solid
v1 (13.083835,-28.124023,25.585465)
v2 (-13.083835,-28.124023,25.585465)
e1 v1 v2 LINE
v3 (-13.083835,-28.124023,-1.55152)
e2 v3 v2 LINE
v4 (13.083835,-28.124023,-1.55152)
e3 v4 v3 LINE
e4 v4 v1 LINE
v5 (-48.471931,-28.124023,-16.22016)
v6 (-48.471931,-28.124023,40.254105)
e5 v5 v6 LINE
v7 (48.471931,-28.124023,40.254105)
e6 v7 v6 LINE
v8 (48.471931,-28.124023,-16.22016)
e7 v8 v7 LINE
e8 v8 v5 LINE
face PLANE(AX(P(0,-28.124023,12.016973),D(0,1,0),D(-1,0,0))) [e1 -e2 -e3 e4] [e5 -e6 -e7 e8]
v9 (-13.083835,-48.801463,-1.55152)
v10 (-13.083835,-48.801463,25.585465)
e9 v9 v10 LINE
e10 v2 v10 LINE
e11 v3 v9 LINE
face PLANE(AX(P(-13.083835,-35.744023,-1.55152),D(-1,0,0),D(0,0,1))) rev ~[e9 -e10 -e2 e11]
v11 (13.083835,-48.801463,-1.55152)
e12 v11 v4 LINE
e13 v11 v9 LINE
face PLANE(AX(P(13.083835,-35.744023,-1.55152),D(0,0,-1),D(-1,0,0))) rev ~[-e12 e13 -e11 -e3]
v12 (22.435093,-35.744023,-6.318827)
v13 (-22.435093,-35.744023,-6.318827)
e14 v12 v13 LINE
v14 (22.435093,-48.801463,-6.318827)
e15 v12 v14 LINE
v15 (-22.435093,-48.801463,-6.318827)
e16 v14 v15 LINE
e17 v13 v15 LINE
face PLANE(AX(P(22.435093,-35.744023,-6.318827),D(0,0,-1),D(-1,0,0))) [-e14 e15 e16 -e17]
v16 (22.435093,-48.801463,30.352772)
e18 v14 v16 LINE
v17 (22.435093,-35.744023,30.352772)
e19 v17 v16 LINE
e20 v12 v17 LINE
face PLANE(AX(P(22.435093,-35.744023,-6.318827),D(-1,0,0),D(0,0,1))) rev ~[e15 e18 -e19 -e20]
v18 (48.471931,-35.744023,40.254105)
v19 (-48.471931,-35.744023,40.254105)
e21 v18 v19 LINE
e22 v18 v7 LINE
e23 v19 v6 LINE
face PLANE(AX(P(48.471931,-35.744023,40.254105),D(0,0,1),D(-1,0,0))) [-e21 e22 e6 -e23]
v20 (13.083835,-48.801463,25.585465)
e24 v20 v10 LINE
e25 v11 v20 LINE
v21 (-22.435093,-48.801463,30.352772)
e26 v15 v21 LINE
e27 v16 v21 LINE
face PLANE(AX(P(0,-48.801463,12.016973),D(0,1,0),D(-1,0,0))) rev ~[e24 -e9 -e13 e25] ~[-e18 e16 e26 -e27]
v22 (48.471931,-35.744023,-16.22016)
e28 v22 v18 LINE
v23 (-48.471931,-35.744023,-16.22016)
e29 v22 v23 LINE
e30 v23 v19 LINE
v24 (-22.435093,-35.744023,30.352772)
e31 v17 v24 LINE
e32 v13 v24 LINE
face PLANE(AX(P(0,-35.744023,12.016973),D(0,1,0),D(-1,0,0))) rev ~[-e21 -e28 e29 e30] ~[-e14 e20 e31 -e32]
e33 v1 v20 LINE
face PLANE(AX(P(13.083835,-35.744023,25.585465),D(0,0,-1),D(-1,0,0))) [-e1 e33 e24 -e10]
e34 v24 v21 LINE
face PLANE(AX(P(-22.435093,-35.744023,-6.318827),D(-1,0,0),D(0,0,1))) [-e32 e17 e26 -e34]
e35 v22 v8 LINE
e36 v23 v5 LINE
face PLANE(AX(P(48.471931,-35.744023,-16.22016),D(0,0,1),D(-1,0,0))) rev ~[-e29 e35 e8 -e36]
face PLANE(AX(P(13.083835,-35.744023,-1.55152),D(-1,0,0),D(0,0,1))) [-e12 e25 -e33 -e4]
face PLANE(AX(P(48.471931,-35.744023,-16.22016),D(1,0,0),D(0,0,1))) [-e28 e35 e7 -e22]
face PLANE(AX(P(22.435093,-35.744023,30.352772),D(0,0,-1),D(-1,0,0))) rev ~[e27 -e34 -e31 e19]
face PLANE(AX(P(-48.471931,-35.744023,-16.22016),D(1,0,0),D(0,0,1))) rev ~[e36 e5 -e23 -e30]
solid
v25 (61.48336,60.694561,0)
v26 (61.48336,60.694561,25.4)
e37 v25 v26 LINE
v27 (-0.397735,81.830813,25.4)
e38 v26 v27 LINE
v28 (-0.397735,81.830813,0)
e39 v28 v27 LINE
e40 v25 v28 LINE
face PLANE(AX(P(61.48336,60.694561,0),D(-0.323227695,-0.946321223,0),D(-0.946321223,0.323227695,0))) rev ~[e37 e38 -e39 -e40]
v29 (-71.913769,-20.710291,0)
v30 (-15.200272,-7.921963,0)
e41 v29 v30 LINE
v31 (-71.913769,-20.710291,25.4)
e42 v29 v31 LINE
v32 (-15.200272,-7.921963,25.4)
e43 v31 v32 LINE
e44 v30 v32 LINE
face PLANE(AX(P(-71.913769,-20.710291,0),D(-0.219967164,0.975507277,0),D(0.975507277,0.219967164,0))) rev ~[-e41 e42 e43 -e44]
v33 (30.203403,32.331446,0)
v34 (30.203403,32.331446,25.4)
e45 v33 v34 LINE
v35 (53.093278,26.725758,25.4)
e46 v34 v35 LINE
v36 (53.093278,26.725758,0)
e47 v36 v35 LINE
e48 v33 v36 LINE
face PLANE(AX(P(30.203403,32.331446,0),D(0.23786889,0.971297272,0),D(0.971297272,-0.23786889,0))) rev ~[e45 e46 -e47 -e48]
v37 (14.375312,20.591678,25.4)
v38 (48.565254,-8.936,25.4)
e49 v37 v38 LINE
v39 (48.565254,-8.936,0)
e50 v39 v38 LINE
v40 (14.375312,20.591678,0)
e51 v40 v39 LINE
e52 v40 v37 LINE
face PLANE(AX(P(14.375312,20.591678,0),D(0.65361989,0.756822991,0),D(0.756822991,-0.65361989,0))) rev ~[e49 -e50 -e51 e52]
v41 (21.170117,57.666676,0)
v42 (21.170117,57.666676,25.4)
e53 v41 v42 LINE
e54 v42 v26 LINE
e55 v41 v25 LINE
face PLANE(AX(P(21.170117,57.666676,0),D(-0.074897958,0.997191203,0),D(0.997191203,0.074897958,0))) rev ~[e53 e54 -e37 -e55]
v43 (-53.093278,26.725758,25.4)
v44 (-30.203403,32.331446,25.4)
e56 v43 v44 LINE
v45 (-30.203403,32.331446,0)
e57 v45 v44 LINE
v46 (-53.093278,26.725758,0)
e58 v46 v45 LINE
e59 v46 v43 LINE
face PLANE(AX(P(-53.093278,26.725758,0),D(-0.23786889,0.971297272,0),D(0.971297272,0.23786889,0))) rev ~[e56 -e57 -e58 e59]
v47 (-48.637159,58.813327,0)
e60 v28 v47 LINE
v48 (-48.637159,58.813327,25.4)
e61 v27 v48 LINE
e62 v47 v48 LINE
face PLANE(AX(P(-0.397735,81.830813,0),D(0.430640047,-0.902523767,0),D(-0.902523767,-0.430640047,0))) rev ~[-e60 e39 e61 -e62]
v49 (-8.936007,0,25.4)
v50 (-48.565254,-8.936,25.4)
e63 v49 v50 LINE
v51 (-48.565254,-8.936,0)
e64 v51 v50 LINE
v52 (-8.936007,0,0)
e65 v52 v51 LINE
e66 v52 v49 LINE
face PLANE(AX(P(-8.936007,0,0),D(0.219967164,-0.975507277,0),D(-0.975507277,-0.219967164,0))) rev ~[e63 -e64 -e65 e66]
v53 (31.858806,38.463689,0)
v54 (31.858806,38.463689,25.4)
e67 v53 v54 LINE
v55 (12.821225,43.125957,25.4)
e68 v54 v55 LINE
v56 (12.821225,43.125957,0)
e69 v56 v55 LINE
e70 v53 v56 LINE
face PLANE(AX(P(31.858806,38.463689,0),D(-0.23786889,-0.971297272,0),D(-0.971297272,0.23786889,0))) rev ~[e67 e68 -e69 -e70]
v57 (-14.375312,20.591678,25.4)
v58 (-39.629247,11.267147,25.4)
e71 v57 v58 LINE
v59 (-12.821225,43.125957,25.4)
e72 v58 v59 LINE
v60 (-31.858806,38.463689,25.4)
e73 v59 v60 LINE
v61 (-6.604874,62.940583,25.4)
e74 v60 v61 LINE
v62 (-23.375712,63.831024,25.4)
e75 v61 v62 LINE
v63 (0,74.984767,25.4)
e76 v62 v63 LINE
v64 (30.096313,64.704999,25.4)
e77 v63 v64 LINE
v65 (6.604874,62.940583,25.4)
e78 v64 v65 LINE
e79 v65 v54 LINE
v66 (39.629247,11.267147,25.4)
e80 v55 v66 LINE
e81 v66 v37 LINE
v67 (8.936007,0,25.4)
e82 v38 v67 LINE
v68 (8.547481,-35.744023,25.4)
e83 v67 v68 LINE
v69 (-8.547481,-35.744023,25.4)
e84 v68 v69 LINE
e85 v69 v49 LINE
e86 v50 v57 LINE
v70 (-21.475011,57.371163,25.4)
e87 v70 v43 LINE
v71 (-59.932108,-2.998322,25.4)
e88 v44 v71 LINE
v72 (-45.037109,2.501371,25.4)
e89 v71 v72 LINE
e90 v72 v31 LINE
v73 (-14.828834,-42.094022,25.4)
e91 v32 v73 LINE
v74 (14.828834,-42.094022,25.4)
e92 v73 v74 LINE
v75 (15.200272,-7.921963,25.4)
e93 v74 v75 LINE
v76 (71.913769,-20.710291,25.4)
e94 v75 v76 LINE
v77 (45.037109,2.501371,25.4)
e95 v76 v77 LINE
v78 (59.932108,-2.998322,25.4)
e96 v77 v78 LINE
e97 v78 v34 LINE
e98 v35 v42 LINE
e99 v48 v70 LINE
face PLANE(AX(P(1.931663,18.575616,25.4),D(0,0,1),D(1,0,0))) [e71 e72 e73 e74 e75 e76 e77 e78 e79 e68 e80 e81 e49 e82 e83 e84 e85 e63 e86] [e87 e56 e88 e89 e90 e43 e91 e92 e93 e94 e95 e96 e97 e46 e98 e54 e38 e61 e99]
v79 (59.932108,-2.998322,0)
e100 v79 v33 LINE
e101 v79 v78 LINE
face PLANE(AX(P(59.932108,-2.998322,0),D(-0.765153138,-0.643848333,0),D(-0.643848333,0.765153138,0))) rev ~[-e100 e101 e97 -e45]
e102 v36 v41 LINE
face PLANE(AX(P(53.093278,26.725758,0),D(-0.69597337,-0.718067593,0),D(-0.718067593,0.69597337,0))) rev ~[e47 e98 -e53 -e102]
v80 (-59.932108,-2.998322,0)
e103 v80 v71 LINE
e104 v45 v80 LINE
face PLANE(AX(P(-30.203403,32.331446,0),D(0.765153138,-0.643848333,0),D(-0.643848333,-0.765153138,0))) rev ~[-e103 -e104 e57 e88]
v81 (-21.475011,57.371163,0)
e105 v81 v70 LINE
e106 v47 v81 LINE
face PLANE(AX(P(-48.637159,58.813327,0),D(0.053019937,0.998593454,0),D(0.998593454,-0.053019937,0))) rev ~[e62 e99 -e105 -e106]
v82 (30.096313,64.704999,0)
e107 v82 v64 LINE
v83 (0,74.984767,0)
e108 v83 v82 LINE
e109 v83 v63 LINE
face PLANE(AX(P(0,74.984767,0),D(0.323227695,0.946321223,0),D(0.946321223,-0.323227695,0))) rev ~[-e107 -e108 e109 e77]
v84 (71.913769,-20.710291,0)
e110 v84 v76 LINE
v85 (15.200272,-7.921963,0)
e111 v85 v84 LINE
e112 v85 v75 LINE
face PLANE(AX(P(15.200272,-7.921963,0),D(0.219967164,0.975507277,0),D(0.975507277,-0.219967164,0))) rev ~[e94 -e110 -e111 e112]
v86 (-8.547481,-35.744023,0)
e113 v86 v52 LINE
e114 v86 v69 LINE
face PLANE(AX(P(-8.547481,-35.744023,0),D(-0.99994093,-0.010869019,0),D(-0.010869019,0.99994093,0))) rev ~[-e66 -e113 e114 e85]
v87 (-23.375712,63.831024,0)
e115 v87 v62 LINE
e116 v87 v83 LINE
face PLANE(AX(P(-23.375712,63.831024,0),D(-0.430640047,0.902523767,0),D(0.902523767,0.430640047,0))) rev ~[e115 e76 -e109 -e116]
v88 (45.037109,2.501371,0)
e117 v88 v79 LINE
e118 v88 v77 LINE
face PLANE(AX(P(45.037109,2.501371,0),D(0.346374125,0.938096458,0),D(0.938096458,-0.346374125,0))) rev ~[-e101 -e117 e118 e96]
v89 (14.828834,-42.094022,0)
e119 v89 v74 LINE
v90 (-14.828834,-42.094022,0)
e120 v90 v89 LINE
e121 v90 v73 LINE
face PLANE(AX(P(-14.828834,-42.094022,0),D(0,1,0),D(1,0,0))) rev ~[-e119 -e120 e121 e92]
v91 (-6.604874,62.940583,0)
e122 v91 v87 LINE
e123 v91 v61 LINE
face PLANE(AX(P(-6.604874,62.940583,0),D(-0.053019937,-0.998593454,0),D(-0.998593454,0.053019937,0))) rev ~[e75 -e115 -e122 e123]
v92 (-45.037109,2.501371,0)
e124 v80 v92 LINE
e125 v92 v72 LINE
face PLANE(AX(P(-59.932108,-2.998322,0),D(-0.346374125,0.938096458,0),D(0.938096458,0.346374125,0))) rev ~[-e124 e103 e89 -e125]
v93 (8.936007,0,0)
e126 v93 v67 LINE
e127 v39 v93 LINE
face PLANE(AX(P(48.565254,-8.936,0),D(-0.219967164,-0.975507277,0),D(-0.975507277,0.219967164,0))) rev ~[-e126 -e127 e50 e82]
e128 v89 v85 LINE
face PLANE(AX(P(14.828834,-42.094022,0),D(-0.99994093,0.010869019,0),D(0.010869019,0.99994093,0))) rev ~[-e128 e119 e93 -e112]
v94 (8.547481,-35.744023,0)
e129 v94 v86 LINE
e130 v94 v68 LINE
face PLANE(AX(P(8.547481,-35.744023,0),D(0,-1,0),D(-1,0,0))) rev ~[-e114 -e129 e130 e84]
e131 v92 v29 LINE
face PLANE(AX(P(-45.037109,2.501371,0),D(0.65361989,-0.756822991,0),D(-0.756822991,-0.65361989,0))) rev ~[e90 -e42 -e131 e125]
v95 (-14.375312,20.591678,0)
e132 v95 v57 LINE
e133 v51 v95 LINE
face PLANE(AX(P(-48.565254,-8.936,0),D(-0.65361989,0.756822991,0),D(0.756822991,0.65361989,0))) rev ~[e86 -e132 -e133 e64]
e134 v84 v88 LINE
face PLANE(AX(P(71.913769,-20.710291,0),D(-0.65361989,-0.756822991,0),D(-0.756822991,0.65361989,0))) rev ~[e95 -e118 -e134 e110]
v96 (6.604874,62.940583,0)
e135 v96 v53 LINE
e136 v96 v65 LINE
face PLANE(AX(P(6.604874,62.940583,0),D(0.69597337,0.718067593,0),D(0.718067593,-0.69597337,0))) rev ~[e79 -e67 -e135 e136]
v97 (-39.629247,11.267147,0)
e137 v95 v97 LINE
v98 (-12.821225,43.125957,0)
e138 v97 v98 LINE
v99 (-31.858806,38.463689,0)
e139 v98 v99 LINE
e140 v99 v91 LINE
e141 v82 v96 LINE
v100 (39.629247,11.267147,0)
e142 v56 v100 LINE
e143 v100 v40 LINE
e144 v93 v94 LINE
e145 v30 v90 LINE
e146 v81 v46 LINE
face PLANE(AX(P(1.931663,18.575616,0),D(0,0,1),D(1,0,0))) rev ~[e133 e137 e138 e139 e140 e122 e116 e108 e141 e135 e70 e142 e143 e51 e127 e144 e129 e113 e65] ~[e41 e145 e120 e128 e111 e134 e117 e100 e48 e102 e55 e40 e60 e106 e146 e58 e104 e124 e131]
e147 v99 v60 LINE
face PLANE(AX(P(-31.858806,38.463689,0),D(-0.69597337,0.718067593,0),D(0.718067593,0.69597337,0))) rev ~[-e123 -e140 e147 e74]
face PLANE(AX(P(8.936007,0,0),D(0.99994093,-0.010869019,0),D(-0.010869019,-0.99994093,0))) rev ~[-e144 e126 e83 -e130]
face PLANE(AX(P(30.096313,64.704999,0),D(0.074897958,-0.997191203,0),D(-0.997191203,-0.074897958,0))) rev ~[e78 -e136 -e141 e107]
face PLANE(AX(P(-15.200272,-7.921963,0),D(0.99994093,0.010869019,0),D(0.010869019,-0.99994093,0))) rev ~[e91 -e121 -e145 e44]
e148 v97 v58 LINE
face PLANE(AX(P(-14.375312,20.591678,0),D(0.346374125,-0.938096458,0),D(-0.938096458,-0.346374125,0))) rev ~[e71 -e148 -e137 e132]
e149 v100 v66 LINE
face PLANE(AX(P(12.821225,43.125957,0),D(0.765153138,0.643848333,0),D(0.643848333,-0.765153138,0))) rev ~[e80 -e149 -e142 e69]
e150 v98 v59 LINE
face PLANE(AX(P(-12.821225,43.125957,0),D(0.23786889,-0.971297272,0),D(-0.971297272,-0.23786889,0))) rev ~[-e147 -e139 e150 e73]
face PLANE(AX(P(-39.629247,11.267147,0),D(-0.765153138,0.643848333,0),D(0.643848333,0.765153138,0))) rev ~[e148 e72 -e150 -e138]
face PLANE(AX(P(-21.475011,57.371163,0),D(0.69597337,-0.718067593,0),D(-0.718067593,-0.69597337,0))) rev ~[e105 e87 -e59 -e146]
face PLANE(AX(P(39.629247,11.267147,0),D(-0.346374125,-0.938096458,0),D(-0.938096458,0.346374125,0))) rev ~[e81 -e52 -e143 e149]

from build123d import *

# Parameters (mm, degrees)
F1_DEPTH = 25.4
F2_W     = 96.9438627362
F2_H     = 56.4742647111
F2_W_2   = 44.8701865971
F2_H_2   = 36.6715993732
F2_W_3   = 26.1676702648
F2_H_3   = 27.1369842812
F3_DEPTH = 7.62
F4_DEPTH = 13.05744


with BuildPart() as f1:
    # F0 (on Top) → F1 (new body)
    with BuildSketch(Plane.XY):
        Polygon((-15.2002724628, -7.9219630817), (-14.8288337448, -42.0940224084), (0, -42.0940224084), (14.8288337448, -42.0940224084), (15.2002724628, -7.9219630817), (71.9137688096, -20.7102910067), (45.0371085278, 2.5013713437), (59.9321083919, -2.9983216828), (30.2034030994, 32.3314461975), (53.0932784976, 26.7257584044), (21.1701166571, 57.6666764014), (61.4833603316, 60.6945607437), (-0.3977347554, 81.830812644), (-48.6371593785, 58.8133267539), (-21.4750114589, 57.3711629086), (-53.0932784976, 26.7257584044), (-30.2034030994, 32.3314461975), (-59.9321083919, -2.9983216828), (-45.0371085278, 2.5013713437), (-71.9137688096, -20.7102910067), align=None)
        Polygon((8.5474811494, -35.744022578), (0, -35.744022578), (-8.5474811494, -35.744022578), (-8.9360065758, 0), (-48.5652536154, -8.9360000566), (-14.3753122538, 20.5916780978), (-39.6292470396, 11.267147027), (-12.8212254494, 43.1259572506), (-31.858805567, 38.4636893868), (-6.6048740409, 62.940582633), (-23.3757123351, 63.8310238719), (0, 74.9847665429), (30.0963129848, 64.7049993277), (6.6048740409, 62.940582633), (31.858805567, 38.4636893868), (12.8212254494, 43.1259572506), (39.6292470396, 11.267147027), (14.3753122538, 20.5916780978), (48.5652536154, -8.9360000566), (8.9360065758, 0), align=None, mode=Mode.SUBTRACT)
    extrude(amount=F1_DEPTH)


with BuildPart() as f3:
    # F2 (on face) → F3 (new body)
    with BuildSketch(Plane(origin=(0, -35.744022578, 0), x_dir=(-1, 0, 0), z_dir=(0, 1, 0))):
        with Locations((0, 12.0169725269)):
            Rectangle(F2_W, F2_H)
        with Locations((0, 12.0169725269)):
            Rectangle(F2_W_2, F2_H_2, mode=Mode.SUBTRACT)
        with Locations((0, 12.0169725269)):
            Rectangle(F2_W_2, F2_H_2)
        with Locations((0, 12.0169725269)):
            Rectangle(F2_W_3, F2_H_3, mode=Mode.SUBTRACT)
    extrude(amount=F3_DEPTH)

    # F2 (on face) → F4 (join)
    with BuildSketch(Plane(origin=(0, -35.744022578, 0), x_dir=(-1, 0, 0), z_dir=(0, 1, 0))):
        with Locations((0, 12.0169725269)):
            Rectangle(F2_W_2, F2_H_2)
        with Locations((0, 12.0169725269)):
            Rectangle(F2_W_3, F2_H_3, mode=Mode.SUBTRACT)
    extrude(amount=-F4_DEPTH)


solid = Compound([f1.part, f3.part])
